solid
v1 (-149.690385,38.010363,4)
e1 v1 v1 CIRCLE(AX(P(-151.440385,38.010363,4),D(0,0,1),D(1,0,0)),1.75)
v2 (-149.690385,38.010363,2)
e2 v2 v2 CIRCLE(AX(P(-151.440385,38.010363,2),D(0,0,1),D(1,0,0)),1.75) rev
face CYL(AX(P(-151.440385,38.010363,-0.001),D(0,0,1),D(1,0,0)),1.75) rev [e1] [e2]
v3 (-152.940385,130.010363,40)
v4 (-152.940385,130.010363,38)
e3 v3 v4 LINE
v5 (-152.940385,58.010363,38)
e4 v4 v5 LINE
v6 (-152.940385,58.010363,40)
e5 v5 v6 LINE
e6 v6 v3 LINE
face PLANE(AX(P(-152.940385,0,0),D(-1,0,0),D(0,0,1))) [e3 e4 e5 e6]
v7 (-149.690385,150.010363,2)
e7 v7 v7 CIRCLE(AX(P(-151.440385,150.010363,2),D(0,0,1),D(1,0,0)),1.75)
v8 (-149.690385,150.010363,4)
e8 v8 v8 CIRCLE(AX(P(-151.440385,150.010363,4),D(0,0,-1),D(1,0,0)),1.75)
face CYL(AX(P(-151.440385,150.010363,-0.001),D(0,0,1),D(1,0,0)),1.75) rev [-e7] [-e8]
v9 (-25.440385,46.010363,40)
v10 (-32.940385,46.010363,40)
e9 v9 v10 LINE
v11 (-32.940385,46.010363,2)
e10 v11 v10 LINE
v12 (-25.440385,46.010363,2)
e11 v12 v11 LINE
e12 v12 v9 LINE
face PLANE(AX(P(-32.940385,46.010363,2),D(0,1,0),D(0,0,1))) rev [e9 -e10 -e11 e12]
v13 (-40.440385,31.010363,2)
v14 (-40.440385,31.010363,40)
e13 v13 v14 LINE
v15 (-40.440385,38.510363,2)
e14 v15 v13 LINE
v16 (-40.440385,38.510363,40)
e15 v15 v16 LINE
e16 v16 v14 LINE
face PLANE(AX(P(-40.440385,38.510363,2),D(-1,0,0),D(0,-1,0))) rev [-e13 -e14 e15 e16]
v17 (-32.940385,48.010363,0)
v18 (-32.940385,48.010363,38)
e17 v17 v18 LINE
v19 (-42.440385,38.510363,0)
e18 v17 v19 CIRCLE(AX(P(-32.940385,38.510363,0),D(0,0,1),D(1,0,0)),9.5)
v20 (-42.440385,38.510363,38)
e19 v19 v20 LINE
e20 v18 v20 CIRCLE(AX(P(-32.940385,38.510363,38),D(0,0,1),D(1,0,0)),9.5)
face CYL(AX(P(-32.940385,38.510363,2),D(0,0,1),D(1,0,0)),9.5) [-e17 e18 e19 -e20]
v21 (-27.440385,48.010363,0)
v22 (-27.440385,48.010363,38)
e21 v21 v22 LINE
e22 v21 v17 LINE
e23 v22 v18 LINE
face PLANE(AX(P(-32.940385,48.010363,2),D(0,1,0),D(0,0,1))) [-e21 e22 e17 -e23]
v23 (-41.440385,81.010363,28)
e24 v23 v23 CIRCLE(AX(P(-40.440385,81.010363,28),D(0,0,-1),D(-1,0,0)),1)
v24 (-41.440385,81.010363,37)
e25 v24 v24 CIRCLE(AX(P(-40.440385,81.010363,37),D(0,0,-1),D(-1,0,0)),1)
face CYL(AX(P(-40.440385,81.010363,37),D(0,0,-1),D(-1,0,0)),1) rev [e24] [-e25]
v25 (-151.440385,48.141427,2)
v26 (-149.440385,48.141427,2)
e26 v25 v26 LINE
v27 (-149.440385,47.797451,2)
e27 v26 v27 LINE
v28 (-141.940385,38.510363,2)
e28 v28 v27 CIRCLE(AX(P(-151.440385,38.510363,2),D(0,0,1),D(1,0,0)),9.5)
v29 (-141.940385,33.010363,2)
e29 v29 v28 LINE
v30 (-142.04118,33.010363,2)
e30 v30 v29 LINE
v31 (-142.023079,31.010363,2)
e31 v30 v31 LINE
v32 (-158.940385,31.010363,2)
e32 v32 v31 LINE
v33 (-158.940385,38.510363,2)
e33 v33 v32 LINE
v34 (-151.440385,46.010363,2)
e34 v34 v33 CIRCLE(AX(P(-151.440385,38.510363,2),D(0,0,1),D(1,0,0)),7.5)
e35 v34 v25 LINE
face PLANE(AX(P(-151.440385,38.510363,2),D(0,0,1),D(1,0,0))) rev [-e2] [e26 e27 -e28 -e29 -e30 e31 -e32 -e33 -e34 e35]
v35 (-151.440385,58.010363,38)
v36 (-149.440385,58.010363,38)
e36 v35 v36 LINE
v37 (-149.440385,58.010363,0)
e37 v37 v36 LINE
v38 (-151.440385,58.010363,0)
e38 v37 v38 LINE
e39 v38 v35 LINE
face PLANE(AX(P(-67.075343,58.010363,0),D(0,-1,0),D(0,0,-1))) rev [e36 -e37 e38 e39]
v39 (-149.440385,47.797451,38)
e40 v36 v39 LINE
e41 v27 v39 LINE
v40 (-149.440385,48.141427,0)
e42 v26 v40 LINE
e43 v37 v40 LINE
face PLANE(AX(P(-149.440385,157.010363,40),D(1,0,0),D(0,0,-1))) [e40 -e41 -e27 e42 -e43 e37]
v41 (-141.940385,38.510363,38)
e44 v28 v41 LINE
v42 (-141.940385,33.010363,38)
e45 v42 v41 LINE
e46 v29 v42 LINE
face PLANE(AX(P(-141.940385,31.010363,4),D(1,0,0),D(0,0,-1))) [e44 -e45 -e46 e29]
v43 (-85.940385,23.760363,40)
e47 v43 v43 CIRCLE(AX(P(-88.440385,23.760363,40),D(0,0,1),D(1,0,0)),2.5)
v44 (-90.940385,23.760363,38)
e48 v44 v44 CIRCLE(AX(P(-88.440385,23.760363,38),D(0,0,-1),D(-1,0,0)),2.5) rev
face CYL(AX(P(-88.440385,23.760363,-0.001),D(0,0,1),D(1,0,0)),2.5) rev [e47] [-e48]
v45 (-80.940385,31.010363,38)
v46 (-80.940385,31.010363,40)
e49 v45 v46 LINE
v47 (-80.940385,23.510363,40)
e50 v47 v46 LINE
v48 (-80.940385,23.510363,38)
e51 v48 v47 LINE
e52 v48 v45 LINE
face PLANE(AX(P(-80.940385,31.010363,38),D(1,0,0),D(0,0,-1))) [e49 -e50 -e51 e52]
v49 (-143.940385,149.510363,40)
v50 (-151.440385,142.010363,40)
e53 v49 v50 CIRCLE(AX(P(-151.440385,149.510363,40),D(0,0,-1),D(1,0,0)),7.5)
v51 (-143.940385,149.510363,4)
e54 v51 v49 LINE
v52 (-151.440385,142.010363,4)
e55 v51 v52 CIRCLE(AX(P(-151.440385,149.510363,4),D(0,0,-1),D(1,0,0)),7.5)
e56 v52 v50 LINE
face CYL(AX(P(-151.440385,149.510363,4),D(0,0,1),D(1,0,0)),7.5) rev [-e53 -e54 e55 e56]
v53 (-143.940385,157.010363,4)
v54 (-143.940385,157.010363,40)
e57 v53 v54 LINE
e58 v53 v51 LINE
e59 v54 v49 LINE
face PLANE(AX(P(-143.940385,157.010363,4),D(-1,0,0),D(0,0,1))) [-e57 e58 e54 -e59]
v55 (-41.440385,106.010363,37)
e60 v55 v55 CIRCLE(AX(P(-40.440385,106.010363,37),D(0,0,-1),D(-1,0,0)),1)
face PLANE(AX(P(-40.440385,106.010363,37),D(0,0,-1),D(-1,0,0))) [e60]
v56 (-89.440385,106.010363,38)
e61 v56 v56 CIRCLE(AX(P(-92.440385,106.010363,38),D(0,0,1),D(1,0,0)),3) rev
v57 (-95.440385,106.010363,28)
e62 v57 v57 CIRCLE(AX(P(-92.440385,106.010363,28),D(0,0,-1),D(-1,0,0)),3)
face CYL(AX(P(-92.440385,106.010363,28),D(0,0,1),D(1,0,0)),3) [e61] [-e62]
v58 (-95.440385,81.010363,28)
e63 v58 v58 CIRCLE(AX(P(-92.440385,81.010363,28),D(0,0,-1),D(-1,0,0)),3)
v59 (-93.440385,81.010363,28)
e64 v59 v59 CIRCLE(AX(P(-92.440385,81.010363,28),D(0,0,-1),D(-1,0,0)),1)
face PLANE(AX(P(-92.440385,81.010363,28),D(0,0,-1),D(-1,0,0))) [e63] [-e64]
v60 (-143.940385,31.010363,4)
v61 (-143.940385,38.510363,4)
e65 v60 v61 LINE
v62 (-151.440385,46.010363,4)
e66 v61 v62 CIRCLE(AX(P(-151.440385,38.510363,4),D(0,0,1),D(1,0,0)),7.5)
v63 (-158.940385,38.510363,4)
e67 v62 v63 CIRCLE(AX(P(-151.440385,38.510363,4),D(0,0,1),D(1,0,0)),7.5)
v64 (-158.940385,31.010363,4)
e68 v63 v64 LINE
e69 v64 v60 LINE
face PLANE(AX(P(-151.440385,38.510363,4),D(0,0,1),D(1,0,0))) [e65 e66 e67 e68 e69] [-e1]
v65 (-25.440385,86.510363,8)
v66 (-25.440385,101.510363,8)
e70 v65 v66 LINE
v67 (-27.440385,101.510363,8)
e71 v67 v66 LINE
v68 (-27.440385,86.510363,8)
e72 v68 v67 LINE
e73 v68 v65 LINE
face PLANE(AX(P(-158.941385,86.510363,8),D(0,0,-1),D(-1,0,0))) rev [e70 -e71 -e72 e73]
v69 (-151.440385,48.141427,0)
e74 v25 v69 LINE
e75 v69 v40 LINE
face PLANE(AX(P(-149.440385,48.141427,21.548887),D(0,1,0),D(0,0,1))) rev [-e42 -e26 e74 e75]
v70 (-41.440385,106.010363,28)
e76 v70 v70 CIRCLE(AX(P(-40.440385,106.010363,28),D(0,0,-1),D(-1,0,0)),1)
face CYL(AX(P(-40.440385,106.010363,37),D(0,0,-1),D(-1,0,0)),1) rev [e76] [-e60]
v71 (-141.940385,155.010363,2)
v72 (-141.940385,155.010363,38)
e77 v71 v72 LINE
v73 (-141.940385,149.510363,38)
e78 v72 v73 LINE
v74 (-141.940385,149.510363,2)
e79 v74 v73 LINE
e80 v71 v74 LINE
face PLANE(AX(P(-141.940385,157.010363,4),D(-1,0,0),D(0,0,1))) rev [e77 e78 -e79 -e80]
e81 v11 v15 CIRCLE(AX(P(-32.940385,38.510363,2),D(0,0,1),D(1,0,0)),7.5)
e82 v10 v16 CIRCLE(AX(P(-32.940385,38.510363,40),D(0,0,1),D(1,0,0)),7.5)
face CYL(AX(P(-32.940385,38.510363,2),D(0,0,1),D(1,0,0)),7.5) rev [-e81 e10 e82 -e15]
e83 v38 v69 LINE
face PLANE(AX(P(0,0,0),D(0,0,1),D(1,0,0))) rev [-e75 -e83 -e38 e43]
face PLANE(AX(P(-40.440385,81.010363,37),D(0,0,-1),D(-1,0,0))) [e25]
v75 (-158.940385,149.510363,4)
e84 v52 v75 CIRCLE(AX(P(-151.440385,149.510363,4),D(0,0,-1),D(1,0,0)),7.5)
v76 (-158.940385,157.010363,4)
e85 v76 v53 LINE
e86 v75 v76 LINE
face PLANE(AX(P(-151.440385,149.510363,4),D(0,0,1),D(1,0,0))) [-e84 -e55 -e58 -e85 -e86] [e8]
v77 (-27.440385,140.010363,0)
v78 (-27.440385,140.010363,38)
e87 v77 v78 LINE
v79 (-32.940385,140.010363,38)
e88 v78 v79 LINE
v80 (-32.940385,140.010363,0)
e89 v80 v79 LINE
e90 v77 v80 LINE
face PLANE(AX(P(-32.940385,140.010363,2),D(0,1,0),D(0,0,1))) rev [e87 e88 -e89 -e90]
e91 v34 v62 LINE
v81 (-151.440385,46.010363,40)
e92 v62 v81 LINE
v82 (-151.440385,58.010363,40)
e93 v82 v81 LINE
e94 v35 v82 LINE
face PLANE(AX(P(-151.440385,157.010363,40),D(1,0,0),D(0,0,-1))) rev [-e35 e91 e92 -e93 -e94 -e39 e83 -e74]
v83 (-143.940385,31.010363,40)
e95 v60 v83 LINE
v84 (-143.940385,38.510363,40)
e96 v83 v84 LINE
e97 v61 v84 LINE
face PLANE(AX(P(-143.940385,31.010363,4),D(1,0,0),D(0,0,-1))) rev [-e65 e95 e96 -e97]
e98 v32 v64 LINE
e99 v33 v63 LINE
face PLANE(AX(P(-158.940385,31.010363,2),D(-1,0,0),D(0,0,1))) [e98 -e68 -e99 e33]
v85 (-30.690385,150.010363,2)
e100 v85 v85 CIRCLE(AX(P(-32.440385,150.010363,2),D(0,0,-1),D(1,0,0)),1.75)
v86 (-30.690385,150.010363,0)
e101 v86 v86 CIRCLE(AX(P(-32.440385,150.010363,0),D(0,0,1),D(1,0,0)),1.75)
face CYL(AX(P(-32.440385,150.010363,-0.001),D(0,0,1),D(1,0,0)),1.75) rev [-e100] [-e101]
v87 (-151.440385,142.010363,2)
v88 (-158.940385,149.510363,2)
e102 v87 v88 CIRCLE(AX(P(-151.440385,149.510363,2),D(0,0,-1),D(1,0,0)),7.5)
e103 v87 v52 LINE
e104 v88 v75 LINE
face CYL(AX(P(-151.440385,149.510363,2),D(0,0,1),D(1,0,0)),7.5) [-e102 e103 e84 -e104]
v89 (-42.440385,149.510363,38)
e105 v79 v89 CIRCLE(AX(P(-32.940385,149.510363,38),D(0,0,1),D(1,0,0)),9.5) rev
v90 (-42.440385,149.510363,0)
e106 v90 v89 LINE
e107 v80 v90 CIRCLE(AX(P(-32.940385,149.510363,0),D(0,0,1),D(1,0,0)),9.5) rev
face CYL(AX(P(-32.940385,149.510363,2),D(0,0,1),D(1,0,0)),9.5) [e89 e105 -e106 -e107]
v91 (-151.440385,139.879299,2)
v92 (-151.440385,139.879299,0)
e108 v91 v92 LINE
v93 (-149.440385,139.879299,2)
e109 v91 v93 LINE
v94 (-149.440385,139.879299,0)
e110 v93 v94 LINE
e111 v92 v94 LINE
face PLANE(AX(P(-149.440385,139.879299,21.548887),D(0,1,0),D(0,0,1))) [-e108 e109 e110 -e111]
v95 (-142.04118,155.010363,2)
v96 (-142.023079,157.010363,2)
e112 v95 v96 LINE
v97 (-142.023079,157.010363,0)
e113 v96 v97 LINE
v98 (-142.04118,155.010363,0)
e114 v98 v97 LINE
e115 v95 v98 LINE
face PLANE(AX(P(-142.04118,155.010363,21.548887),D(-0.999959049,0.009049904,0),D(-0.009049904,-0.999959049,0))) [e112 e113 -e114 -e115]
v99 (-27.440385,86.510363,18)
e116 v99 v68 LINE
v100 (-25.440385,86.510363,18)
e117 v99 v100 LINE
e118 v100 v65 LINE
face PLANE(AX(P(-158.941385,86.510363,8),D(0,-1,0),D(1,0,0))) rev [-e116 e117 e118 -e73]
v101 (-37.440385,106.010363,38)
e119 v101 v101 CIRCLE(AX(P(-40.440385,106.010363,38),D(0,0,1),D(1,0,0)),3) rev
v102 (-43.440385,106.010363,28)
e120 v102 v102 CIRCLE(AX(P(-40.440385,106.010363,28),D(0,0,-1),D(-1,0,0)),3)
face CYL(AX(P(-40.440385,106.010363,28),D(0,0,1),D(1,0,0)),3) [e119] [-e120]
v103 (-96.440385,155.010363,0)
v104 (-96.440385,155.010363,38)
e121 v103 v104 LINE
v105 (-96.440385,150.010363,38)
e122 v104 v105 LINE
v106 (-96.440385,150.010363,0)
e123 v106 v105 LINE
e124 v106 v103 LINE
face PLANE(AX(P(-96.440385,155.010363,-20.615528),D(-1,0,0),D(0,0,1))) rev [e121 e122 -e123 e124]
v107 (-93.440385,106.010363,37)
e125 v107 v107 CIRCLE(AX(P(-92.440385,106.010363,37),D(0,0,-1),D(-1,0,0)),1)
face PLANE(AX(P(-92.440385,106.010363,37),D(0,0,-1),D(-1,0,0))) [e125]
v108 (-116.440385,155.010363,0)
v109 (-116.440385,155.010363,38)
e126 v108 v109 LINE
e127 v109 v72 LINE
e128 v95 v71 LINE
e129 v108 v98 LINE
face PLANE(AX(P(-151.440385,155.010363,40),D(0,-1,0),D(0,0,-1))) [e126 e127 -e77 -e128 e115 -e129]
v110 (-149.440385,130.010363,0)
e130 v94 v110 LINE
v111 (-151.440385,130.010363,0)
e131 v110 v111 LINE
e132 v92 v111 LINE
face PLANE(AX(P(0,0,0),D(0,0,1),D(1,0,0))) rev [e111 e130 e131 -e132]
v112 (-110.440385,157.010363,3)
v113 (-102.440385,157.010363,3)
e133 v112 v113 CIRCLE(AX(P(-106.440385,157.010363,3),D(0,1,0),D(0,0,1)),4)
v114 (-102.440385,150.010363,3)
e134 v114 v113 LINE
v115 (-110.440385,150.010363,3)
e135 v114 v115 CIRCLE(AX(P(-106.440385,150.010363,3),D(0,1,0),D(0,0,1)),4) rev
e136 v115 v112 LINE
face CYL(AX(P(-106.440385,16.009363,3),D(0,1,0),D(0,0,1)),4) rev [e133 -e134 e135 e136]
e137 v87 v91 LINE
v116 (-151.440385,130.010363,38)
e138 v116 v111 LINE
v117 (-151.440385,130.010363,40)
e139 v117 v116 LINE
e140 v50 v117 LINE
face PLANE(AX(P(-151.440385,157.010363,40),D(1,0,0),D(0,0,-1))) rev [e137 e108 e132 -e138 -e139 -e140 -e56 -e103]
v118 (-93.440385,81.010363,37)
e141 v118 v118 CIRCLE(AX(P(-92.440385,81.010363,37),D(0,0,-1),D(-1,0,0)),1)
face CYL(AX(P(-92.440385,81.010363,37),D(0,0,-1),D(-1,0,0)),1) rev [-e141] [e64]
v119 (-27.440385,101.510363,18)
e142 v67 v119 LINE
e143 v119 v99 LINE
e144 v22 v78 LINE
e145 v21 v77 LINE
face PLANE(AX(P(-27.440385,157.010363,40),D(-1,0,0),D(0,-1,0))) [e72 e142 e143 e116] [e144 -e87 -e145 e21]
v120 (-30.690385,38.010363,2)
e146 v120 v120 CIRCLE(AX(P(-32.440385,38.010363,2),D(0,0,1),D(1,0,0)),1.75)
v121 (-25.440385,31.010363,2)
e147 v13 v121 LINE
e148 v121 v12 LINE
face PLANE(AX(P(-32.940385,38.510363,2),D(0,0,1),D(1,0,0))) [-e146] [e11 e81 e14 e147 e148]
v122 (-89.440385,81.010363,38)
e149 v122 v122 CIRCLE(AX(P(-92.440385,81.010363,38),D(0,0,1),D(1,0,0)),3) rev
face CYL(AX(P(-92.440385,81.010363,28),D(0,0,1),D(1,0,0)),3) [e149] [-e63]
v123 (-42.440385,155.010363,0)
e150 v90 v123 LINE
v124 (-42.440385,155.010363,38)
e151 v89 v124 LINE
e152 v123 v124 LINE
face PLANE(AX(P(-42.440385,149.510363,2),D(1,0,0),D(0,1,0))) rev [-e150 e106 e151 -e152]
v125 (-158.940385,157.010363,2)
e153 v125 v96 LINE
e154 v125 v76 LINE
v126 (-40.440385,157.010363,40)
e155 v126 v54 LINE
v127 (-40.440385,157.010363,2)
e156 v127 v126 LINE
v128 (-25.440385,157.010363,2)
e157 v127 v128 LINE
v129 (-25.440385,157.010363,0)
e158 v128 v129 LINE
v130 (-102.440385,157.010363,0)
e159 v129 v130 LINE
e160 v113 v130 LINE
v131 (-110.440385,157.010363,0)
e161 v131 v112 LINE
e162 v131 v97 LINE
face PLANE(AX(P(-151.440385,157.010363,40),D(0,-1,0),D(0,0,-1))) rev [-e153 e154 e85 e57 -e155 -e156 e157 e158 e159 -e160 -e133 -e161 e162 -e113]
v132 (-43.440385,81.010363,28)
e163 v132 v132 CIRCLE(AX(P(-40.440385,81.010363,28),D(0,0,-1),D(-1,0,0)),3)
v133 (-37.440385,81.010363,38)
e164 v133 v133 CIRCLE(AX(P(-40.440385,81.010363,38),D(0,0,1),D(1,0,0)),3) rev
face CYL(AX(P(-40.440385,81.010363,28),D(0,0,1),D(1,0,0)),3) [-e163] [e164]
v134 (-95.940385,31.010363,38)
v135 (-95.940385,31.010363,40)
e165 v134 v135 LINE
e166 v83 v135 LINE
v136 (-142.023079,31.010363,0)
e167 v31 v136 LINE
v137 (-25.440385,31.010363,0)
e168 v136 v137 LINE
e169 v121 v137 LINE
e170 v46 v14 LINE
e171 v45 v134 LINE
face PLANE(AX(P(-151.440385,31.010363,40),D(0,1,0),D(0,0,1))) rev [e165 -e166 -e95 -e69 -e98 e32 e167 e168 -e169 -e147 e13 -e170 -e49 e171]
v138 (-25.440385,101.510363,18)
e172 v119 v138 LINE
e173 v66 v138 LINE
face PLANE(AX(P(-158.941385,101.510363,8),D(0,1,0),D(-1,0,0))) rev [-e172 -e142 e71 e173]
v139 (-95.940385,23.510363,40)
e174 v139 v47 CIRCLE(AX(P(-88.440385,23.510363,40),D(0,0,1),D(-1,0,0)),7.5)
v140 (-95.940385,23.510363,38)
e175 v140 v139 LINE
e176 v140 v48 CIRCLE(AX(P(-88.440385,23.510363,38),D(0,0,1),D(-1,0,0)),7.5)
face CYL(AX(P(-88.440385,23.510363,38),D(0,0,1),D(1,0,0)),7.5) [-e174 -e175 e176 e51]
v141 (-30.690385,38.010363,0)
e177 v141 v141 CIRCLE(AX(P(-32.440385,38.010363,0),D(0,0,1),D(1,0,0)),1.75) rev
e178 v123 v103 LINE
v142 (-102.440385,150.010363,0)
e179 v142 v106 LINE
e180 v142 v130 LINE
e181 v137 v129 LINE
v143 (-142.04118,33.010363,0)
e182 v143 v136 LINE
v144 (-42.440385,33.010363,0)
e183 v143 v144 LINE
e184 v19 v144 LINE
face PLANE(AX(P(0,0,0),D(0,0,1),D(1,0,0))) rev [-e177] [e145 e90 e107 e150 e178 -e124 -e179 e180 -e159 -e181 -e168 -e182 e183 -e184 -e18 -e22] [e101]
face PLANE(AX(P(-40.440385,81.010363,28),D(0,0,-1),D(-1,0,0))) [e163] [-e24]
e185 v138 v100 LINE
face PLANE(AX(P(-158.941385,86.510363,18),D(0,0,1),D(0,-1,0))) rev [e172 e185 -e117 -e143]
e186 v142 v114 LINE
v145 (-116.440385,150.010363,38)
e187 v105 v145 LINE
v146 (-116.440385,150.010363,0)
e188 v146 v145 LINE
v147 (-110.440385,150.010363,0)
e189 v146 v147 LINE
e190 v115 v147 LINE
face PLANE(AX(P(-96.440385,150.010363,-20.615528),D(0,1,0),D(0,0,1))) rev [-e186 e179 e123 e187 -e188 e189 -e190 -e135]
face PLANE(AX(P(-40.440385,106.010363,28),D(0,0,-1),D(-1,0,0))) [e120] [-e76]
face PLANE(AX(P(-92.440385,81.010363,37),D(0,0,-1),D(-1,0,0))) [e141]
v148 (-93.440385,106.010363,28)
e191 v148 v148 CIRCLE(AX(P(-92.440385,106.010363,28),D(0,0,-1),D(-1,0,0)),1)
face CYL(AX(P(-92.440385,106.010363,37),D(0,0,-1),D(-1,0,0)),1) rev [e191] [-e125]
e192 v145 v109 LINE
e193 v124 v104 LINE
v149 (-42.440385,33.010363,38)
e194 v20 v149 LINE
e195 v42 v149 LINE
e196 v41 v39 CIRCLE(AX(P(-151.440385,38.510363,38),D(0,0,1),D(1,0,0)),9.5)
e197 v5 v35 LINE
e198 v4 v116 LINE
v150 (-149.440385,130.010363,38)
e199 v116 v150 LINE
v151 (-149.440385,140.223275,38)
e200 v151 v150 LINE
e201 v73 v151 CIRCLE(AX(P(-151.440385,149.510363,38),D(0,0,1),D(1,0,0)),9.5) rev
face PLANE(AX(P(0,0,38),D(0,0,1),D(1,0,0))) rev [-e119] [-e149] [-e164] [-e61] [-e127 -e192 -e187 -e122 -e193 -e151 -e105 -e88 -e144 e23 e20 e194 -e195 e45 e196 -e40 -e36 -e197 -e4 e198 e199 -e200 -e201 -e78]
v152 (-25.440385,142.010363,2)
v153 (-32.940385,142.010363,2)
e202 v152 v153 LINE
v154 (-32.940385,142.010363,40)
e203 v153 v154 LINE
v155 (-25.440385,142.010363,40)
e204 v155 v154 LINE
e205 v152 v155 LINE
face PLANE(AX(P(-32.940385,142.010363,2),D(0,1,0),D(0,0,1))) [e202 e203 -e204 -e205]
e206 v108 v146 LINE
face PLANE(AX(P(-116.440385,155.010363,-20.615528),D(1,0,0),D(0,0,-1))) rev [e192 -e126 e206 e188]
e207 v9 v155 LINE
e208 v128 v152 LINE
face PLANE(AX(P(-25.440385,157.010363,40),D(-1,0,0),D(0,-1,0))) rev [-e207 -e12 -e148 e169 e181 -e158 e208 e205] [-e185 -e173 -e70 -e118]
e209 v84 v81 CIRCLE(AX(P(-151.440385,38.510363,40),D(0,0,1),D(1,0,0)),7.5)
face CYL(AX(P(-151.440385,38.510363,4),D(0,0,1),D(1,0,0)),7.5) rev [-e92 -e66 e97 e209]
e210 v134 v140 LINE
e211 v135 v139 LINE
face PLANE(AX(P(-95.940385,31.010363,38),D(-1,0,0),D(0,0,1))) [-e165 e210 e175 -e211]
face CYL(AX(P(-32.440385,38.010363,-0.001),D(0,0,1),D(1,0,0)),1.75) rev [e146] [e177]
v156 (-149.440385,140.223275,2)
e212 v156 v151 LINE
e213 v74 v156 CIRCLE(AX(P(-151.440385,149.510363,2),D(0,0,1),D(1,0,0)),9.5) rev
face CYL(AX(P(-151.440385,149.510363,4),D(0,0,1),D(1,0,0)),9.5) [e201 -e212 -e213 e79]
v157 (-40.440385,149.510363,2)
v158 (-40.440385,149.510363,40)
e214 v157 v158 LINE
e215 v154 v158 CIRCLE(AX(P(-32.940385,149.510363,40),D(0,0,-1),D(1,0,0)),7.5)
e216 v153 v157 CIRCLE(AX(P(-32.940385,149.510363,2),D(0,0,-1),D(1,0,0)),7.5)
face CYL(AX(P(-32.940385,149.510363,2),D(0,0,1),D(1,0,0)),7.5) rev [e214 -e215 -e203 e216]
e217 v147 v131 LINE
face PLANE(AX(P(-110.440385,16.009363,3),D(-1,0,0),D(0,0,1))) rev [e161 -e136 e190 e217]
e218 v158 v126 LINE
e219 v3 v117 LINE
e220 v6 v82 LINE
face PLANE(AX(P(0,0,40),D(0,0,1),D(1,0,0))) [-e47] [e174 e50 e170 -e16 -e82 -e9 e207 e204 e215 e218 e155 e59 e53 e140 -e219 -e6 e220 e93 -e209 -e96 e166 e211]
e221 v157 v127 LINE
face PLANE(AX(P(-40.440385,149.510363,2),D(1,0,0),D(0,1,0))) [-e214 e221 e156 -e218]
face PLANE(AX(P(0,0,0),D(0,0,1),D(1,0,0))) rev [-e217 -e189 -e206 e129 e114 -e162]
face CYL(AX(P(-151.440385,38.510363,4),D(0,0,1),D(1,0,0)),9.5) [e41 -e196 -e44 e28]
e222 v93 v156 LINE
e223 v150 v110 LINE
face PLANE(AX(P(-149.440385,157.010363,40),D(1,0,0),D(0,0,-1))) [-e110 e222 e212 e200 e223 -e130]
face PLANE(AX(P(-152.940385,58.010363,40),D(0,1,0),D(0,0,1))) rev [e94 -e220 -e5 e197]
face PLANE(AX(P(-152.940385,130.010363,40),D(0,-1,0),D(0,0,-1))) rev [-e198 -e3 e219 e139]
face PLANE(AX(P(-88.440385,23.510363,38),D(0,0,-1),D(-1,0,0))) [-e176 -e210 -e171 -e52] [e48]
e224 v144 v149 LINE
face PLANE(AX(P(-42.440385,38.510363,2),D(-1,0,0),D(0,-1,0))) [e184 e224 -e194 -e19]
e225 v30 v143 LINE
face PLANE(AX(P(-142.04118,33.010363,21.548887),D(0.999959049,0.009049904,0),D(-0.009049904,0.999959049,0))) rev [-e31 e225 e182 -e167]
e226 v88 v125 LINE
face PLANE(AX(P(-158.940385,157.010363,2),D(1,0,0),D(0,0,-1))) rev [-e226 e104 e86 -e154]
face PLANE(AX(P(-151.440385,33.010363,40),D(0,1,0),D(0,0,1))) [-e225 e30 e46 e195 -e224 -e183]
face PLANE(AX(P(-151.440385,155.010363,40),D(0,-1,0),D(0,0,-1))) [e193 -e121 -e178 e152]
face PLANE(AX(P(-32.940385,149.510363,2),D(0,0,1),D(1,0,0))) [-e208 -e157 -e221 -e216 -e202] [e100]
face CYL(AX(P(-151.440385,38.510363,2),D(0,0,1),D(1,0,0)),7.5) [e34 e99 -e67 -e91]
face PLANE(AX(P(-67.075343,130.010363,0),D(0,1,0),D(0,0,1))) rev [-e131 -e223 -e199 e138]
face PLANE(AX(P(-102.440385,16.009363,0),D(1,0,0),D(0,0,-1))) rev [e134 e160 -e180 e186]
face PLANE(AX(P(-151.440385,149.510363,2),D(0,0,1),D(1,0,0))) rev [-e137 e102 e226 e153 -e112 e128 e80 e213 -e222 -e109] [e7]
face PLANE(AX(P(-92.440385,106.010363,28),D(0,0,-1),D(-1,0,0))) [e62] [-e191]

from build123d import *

# Parameters (mm, degrees)
ESQUISSE1_W                          = 126
ESQUISSE1_H                          = 126
BOSS_EXTRU_1_DEPTH                   = 40
ENL_V_MAT_EXTRU_1_DEPTH              = 38
ENL_V_MAT_EXTRU_2_REACH              = 223.428
ESQUISSE4_R                          = 1.75
ENL_V_MAT_EXTRU_5_DEPTH              = 36
COQUE1_DEPTH                         = 38
COQUE1_2_DEPTH                       = 2
BOSS_EXTRU_3_DEPTH                   = 2
ENL_V_MAT_EXTRU_6_REACH              = 228.297
ESQUISSE13_R                         = 1.75
ENL_V_MAT_EXTRU_14_DEPTH             = 2
ESQUISSE16_W                         = 40
ESQUISSE16_H                         = 72
ENL_V_MAT_EXTRU_9_DEPTH              = 2
BOSS_EXTRU_5_DEPTH                   = 2
ENL_V_MAT_EXTRU_11_REACH             = 228.968
ESQUISSE21_R                         = 2.5
ESQUISSE23_R                         = 3
BOSS_EXTRU_7_DEPTH                   = 10
ESQUISSE24_R                         = 1
ENL_V_MAT_EXTRU_12_DEPTH             = 9
R_P_TITION_LIN_AIRE1_COUNT           = 2
R_P_TITION_LIN_AIRE1_PITCH           = 25
R_P_TITION_LIN_AIRE2_COUNT           = 2
R_P_TITION_LIN_AIRE2_PITCH           = 52
R_P_TITION_LIN_AIRE2_COPY_1_SKETCH_R = 3
R_P_TITION_LIN_AIRE2_COPY_1_DEPTH    = 10
R_P_TITION_LIN_AIRE2_COPY_2_SKETCH_R = 1
R_P_TITION_LIN_AIRE2_COPY_2_DEPTH    = 9
ENL_V_MAT_EXTRU_13_REACH             = 211.939
ESQUISSE25_W                         = 10
ESQUISSE25_H                         = 15
ESQUISSE28_W                         = 2
ESQUISSE28_H                         = 72
BOSS_EXTRU_8_DEPTH                   = 3.5
ESQUISSE30_W                         = 20
ESQUISSE30_H                         = 5
BOSS_EXTRU_9_DEPTH                   = 38
ENL_V_MAT_EXTRU_15_REACH             = 218.201


# Read off the part's stored shape, not the designer's step: Coque1
with BuildPart() as part:
    # Esquisse1 → Boss.-Extru.1 (new body)
    with BuildSketch(Plane.XY):
        with Locations((-88.440384558, 94.010362694)):
            Rectangle(ESQUISSE1_W, ESQUISSE1_H)
    extrude(amount=BOSS_EXTRU_1_DEPTH)

    # Esquisse2 → Enlèv. mat.-Extru.1 (cut)
    with BuildSketch(Plane.XY.offset(40)):
        with BuildLine():
            Line((-40.440384558, 31.010362694), (-25.440384558, 31.010362694))
            Line((-25.440384558, 31.010362694), (-25.440384558, 46.010362694))
            Line((-25.440384558, 46.010362694), (-32.940384558, 46.010362694))
            ThreePointArc((-32.940384558, 46.010362694), (-38.243685417, 43.813663553), (-40.440384558, 38.510362694))
            Line((-40.440384558, 38.510362694), (-40.440384558, 31.010362694))
        make_face()
    enl_v_mat_extru_1 = extrude(amount=-ENL_V_MAT_EXTRU_1_DEPTH, mode=Mode.SUBTRACT)

    # Esquisse4 → Enlèv. mat.-Extru.2 (cut, up to next)
    with BuildSketch(Plane.XY.offset(2), mode=Mode.PRIVATE) as enl_v_mat_extru_2_sk1:
        with Locations((-32.440384558, 38.010362694)):
            Circle(ESQUISSE4_R)
    enl_v_mat_extru_2_tool1 = extrude(enl_v_mat_extru_2_sk1.sketch, amount=-ENL_V_MAT_EXTRU_2_REACH, mode=Mode.PRIVATE) & part.part
    enl_v_mat_extru_2 = enl_v_mat_extru_2_tool1.solids().sort_by_distance((-32.440385, 38.010363, 2))[0]
    add(enl_v_mat_extru_2, mode=Mode.SUBTRACT)

    # Symétrie1: Enlèv. mat.-Extru.1, Enlèv. mat.-Extru.2 across plane
    add(enl_v_mat_extru_1.mirror(Plane(origin=(0, 94.010362694, 0), x_dir=(0, 0, 1), z_dir=(0, -1, 0))), mode=Mode.SUBTRACT)
    add(enl_v_mat_extru_2.mirror(Plane(origin=(0, 94.010362694, 0), x_dir=(0, 0, 1), z_dir=(0, -1, 0))), mode=Mode.SUBTRACT)

    # Esquisse10 → Enlèv. mat.-Extru.5 (cut)
    with BuildSketch(Plane.XY.offset(40)):
        with BuildLine():
            Line((-151.440384558, 46.010362694), (-151.440384558, 31.010362694))
            Line((-151.440384558, 31.010362694), (-143.940384558, 31.010362694))
            Line((-143.940384558, 31.010362694), (-143.940384558, 38.510362694))
            ThreePointArc((-143.940384558, 38.510362694), (-146.137083699, 43.813663553), (-151.440384558, 46.010362694))
        make_face()
    enl_v_mat_extru_5 = extrude(amount=-ENL_V_MAT_EXTRU_5_DEPTH, mode=Mode.SUBTRACT)

    # Symétrie3: Enlèv. mat.-Extru.5 across plane
    add(enl_v_mat_extru_5.mirror(Plane(origin=(0, 94.010362694, 0), x_dir=(0, 0, 1), z_dir=(0, -1, 0))), mode=Mode.SUBTRACT)

    # Coque1 outline → Coque1 (cut)
    with BuildSketch(Plane.XY):
        with BuildLine():
            Line((-42.440384558, 155.010362694), (-141.940384558, 155.010362694))
            Line((-141.940384558, 155.010362694), (-141.940384558, 149.510362694))
            ThreePointArc((-141.940384558, 149.510362694), (-144.049511808, 143.541694501), (-149.440384558, 140.223274884))
            Line((-149.440384558, 140.223274884), (-149.440384558, 47.797450505))
            ThreePointArc((-149.440384558, 47.797450505), (-144.049511808, 44.479030887), (-141.940384558, 38.510362694))
            Line((-141.940384558, 38.510362694), (-141.940384558, 33.010362694))
            Line((-141.940384558, 33.010362694), (-42.440384558, 33.010362694))
            Line((-42.440384558, 33.010362694), (-42.440384558, 38.510362694))
            ThreePointArc((-42.440384558, 38.510362694), (-39.657898979, 45.227877116), (-32.940384558, 48.010362694))
            Line((-32.940384558, 48.010362694), (-27.440384558, 48.010362694))
            Line((-27.440384558, 48.010362694), (-27.440384558, 140.010362694))
            Line((-27.440384558, 140.010362694), (-32.940384558, 140.010362694))
            ThreePointArc((-32.940384558, 140.010362694), (-39.657898979, 142.792848273), (-42.440384558, 149.510362694))
            Line((-42.440384558, 149.510362694), (-42.440384558, 155.010362694))
        make_face()
    extrude(amount=COQUE1_DEPTH, mode=Mode.SUBTRACT)

    # Coque1 2 outline → Coque1 2 (cut)
    with BuildSketch(Plane.XY):
        with BuildLine():
            Line((-141.940384558, 155.010362694), (-149.440384558, 155.010362694))
            Line((-149.440384558, 155.010362694), (-149.440384558, 140.223274884))
            ThreePointArc((-149.440384558, 140.223274884), (-144.049511808, 143.541694501), (-141.940384558, 149.510362694))
            Line((-141.940384558, 149.510362694), (-141.940384558, 155.010362694))
        make_face()
        with BuildLine():
            ThreePointArc((-141.940384558, 38.510362694), (-144.049511808, 44.479030887), (-149.440384558, 47.797450505))
            Line((-149.440384558, 47.797450505), (-149.440384558, 33.010362694))
            Line((-149.440384558, 33.010362694), (-141.940384558, 33.010362694))
            Line((-141.940384558, 33.010362694), (-141.940384558, 38.510362694))
        make_face()
    extrude(amount=COQUE1_2_DEPTH, mode=Mode.SUBTRACT)

    # Esquisse12 → Boss.-Extru.3 (add)
    with BuildSketch(Plane.XY.offset(4)):
        with BuildLine():
            Line((-158.940384558, 31.010362694), (-158.940384558, 38.510362694))
            ThreePointArc((-158.940384558, 38.510362694), (-156.743685417, 43.813663553), (-151.440384558, 46.010362694))
            Line((-151.440384558, 46.010362694), (-151.440384558, 31.010362694))
            Line((-151.440384558, 31.010362694), (-158.940384558, 31.010362694))
        make_face()
    boss_extru_3 = extrude(amount=-BOSS_EXTRU_3_DEPTH)

    # Esquisse13 → Enlèv. mat.-Extru.6 (cut, up to next)
    with BuildSketch(Plane.XY.offset(4), mode=Mode.PRIVATE) as enl_v_mat_extru_6_sk1:
        with Locations((-151.440384558, 38.010362694)):
            Circle(ESQUISSE13_R)
    enl_v_mat_extru_6_tool1 = extrude(enl_v_mat_extru_6_sk1.sketch, amount=-ENL_V_MAT_EXTRU_6_REACH, mode=Mode.PRIVATE) & part.part
    enl_v_mat_extru_6 = enl_v_mat_extru_6_tool1.solids().sort_by_distance((-151.440385, 38.010363, 4))[0]
    add(enl_v_mat_extru_6, mode=Mode.SUBTRACT)

    # Esquisse27 → Enlèv. mat.-Extru.14 (cut)
    with BuildSketch(Plane(origin=(0, 0, 0), x_dir=(-1, 0, 0), z_dir=(0, 0, -1))):
        Polygon((149.440384558, 33.010362694), (149.440384558, 48.141426507), (151.440384558, 48.141426507), (151.440384558, 31.010362694), (142.02307923, 31.010362694), (142.041179779, 33.010362694), align=None)
    enl_v_mat_extru_14 = extrude(amount=-ENL_V_MAT_EXTRU_14_DEPTH, mode=Mode.SUBTRACT)

    # Symétrie5: Boss.-Extru.3, Enlèv. mat.-Extru.6, Enlèv. mat.-Extru.14 across plane
    add(boss_extru_3.mirror(Plane(origin=(0, 94.010362694, 0), x_dir=(0, 0, 1), z_dir=(0, -1, 0))))
    add(enl_v_mat_extru_6.mirror(Plane(origin=(0, 94.010362694, 0), x_dir=(0, 0, 1), z_dir=(0, -1, 0))), mode=Mode.SUBTRACT)
    add(enl_v_mat_extru_14.mirror(Plane(origin=(0, 94.010362694, 0), x_dir=(0, 0, 1), z_dir=(0, -1, 0))), mode=Mode.SUBTRACT)

    # Esquisse16 → Enlèv. mat.-Extru.9 (cut)
    with BuildSketch(Plane.ZY.offset(151.440384558)):
        with Locations((20, 94.010362694)):
            Rectangle(ESQUISSE16_W, ESQUISSE16_H)
    extrude(amount=-ENL_V_MAT_EXTRU_9_DEPTH, mode=Mode.SUBTRACT)

    # Esquisse20 → Boss.-Extru.5 (add)
    with BuildSketch(Plane.XY.offset(40)):
        with BuildLine():
            Line((-80.940384558, 31.010362694), (-95.940384558, 31.010362694))
            Line((-95.940384558, 31.010362694), (-95.940384558, 23.510362694))
            ThreePointArc((-95.940384558, 23.510362694), (-88.440384558, 16.010362694), (-80.940384558, 23.510362694))
            Line((-80.940384558, 23.510362694), (-80.940384558, 31.010362694))
        make_face()
    extrude(amount=-BOSS_EXTRU_5_DEPTH)

    # Esquisse21 → Enlèv. mat.-Extru.11 (cut, up to next)
    with BuildSketch(Plane.XY.offset(40), mode=Mode.PRIVATE) as enl_v_mat_extru_11_sk1:
        with Locations((-88.440384558, 23.760362694)):
            Circle(ESQUISSE21_R)
    enl_v_mat_extru_11_tool1 = extrude(enl_v_mat_extru_11_sk1.sketch, amount=-ENL_V_MAT_EXTRU_11_REACH, mode=Mode.PRIVATE) & part.part
    add(enl_v_mat_extru_11_tool1.solids().sort_by_distance((-88.440385, 23.760363, 40))[0], mode=Mode.SUBTRACT)

    # Esquisse23 → Boss.-Extru.7 (add)
    with BuildSketch(Plane(origin=(0, 0, 38), x_dir=(-1, 0, 0), z_dir=(0, 0, -1))):
        with Locations(Location((40.440384558, 81.010362694, 0), (0, 0, 180))):
            Circle(ESQUISSE23_R)
    boss_extru_7 = extrude(amount=BOSS_EXTRU_7_DEPTH)

    # Esquisse24 → Enlèv. mat.-Extru.12 (cut)
    with BuildSketch(Plane(origin=(0, 0, 28), x_dir=(-1, 0, 0), z_dir=(0, 0, -1))):
        with Locations((40.440384558, 81.010362694)):
            Circle(ESQUISSE24_R)
    enl_v_mat_extru_12 = extrude(amount=-ENL_V_MAT_EXTRU_12_DEPTH, mode=Mode.SUBTRACT)

    # Répétition linéaire1: Boss.-Extru.7, Enlèv. mat.-Extru.12 ×2
    with Locations(*[(0, i * R_P_TITION_LIN_AIRE1_PITCH, 0) for i in range(1, R_P_TITION_LIN_AIRE1_COUNT)]):
        add(boss_extru_7)
        add(enl_v_mat_extru_12, mode=Mode.SUBTRACT)

    # Répétition linéaire2: Boss.-Extru.7, Enlèv. mat.-Extru.12 ×2
    with Locations(*[(-i * R_P_TITION_LIN_AIRE2_PITCH, 0, 0) for i in range(1, R_P_TITION_LIN_AIRE2_COUNT)]):
        add(boss_extru_7)
        add(enl_v_mat_extru_12, mode=Mode.SUBTRACT)

    # Répétition linéaire2 copy 1 sketch → Répétition linéaire2 copy 1 (add)
    with BuildSketch(Plane(origin=(-52, 25, 38), x_dir=(-1, 0, 0), z_dir=(0, 0, -1))):
        with Locations(Location((40.440384558, 81.010362694, 0), (0, 0, 180))):
            Circle(R_P_TITION_LIN_AIRE2_COPY_1_SKETCH_R)
    extrude(amount=R_P_TITION_LIN_AIRE2_COPY_1_DEPTH)

    # Répétition linéaire2 copy 2 sketch → Répétition linéaire2 copy 2 (cut)
    with BuildSketch(Plane(origin=(-52, 25, 28), x_dir=(-1, 0, 0), z_dir=(0, 0, -1))):
        with Locations((40.440384558, 81.010362694)):
            Circle(R_P_TITION_LIN_AIRE2_COPY_2_SKETCH_R)
    extrude(amount=-R_P_TITION_LIN_AIRE2_COPY_2_DEPTH, mode=Mode.SUBTRACT)

    # Esquisse25 → Enlèv. mat.-Extru.13 (cut, up to next)
    with BuildSketch(Plane(origin=(-25.440384558, 0, 0), x_dir=(0, 0, -1), z_dir=(1, 0, 0)), mode=Mode.PRIVATE) as enl_v_mat_extru_13_sk1:
        with Locations((-13, 94.010362694)):
            Rectangle(ESQUISSE25_W, ESQUISSE25_H)
    enl_v_mat_extru_13_tool1 = extrude(enl_v_mat_extru_13_sk1.sketch, amount=-ENL_V_MAT_EXTRU_13_REACH, mode=Mode.PRIVATE) & part.part
    add(enl_v_mat_extru_13_tool1.solids().sort_by_distance((-25.440385, 94.010363, 13))[0], mode=Mode.SUBTRACT)

    # Esquisse28 → Boss.-Extru.8 (add)
    with BuildSketch(Plane.ZY.offset(149.440384558)):
        with Locations((39, 94.010362694)):
            Rectangle(ESQUISSE28_W, ESQUISSE28_H)
    extrude(amount=BOSS_EXTRU_8_DEPTH)

    # Esquisse30 → Boss.-Extru.9 (add)
    with BuildSketch(Plane(origin=(0, 0, 38), x_dir=(-1, 0, 0), z_dir=(0, 0, -1))):
        with Locations((106.440384558, 152.510362694)):
            Rectangle(ESQUISSE30_W, ESQUISSE30_H)
    extrude(amount=BOSS_EXTRU_9_DEPTH)

    # Esquisse29 → Enlèv. mat.-Extru.15 (cut, up to next)
    with BuildSketch(Plane(origin=(0, 157.010362694, 0), x_dir=(1, 0, 0), z_dir=(0, 1, 0)), mode=Mode.PRIVATE) as enl_v_mat_extru_15_sk1:
        with BuildLine():
            Line((-110.440384558, -3), (-110.440384558, 0))
            Line((-110.440384558, 0), (-102.440384558, 0))
            Line((-102.440384558, 0), (-102.440384558, -3))
            ThreePointArc((-102.440384558, -3), (-106.440384558, -7), (-110.440384558, -3))
        make_face()
    enl_v_mat_extru_15_tool1 = extrude(enl_v_mat_extru_15_sk1.sketch, amount=-ENL_V_MAT_EXTRU_15_REACH, mode=Mode.PRIVATE) & part.part
    add(enl_v_mat_extru_15_tool1.solids().sort_by_distance((-106.440385, 157.010363, 3.135687))[0], mode=Mode.SUBTRACT)


solid = part.part
